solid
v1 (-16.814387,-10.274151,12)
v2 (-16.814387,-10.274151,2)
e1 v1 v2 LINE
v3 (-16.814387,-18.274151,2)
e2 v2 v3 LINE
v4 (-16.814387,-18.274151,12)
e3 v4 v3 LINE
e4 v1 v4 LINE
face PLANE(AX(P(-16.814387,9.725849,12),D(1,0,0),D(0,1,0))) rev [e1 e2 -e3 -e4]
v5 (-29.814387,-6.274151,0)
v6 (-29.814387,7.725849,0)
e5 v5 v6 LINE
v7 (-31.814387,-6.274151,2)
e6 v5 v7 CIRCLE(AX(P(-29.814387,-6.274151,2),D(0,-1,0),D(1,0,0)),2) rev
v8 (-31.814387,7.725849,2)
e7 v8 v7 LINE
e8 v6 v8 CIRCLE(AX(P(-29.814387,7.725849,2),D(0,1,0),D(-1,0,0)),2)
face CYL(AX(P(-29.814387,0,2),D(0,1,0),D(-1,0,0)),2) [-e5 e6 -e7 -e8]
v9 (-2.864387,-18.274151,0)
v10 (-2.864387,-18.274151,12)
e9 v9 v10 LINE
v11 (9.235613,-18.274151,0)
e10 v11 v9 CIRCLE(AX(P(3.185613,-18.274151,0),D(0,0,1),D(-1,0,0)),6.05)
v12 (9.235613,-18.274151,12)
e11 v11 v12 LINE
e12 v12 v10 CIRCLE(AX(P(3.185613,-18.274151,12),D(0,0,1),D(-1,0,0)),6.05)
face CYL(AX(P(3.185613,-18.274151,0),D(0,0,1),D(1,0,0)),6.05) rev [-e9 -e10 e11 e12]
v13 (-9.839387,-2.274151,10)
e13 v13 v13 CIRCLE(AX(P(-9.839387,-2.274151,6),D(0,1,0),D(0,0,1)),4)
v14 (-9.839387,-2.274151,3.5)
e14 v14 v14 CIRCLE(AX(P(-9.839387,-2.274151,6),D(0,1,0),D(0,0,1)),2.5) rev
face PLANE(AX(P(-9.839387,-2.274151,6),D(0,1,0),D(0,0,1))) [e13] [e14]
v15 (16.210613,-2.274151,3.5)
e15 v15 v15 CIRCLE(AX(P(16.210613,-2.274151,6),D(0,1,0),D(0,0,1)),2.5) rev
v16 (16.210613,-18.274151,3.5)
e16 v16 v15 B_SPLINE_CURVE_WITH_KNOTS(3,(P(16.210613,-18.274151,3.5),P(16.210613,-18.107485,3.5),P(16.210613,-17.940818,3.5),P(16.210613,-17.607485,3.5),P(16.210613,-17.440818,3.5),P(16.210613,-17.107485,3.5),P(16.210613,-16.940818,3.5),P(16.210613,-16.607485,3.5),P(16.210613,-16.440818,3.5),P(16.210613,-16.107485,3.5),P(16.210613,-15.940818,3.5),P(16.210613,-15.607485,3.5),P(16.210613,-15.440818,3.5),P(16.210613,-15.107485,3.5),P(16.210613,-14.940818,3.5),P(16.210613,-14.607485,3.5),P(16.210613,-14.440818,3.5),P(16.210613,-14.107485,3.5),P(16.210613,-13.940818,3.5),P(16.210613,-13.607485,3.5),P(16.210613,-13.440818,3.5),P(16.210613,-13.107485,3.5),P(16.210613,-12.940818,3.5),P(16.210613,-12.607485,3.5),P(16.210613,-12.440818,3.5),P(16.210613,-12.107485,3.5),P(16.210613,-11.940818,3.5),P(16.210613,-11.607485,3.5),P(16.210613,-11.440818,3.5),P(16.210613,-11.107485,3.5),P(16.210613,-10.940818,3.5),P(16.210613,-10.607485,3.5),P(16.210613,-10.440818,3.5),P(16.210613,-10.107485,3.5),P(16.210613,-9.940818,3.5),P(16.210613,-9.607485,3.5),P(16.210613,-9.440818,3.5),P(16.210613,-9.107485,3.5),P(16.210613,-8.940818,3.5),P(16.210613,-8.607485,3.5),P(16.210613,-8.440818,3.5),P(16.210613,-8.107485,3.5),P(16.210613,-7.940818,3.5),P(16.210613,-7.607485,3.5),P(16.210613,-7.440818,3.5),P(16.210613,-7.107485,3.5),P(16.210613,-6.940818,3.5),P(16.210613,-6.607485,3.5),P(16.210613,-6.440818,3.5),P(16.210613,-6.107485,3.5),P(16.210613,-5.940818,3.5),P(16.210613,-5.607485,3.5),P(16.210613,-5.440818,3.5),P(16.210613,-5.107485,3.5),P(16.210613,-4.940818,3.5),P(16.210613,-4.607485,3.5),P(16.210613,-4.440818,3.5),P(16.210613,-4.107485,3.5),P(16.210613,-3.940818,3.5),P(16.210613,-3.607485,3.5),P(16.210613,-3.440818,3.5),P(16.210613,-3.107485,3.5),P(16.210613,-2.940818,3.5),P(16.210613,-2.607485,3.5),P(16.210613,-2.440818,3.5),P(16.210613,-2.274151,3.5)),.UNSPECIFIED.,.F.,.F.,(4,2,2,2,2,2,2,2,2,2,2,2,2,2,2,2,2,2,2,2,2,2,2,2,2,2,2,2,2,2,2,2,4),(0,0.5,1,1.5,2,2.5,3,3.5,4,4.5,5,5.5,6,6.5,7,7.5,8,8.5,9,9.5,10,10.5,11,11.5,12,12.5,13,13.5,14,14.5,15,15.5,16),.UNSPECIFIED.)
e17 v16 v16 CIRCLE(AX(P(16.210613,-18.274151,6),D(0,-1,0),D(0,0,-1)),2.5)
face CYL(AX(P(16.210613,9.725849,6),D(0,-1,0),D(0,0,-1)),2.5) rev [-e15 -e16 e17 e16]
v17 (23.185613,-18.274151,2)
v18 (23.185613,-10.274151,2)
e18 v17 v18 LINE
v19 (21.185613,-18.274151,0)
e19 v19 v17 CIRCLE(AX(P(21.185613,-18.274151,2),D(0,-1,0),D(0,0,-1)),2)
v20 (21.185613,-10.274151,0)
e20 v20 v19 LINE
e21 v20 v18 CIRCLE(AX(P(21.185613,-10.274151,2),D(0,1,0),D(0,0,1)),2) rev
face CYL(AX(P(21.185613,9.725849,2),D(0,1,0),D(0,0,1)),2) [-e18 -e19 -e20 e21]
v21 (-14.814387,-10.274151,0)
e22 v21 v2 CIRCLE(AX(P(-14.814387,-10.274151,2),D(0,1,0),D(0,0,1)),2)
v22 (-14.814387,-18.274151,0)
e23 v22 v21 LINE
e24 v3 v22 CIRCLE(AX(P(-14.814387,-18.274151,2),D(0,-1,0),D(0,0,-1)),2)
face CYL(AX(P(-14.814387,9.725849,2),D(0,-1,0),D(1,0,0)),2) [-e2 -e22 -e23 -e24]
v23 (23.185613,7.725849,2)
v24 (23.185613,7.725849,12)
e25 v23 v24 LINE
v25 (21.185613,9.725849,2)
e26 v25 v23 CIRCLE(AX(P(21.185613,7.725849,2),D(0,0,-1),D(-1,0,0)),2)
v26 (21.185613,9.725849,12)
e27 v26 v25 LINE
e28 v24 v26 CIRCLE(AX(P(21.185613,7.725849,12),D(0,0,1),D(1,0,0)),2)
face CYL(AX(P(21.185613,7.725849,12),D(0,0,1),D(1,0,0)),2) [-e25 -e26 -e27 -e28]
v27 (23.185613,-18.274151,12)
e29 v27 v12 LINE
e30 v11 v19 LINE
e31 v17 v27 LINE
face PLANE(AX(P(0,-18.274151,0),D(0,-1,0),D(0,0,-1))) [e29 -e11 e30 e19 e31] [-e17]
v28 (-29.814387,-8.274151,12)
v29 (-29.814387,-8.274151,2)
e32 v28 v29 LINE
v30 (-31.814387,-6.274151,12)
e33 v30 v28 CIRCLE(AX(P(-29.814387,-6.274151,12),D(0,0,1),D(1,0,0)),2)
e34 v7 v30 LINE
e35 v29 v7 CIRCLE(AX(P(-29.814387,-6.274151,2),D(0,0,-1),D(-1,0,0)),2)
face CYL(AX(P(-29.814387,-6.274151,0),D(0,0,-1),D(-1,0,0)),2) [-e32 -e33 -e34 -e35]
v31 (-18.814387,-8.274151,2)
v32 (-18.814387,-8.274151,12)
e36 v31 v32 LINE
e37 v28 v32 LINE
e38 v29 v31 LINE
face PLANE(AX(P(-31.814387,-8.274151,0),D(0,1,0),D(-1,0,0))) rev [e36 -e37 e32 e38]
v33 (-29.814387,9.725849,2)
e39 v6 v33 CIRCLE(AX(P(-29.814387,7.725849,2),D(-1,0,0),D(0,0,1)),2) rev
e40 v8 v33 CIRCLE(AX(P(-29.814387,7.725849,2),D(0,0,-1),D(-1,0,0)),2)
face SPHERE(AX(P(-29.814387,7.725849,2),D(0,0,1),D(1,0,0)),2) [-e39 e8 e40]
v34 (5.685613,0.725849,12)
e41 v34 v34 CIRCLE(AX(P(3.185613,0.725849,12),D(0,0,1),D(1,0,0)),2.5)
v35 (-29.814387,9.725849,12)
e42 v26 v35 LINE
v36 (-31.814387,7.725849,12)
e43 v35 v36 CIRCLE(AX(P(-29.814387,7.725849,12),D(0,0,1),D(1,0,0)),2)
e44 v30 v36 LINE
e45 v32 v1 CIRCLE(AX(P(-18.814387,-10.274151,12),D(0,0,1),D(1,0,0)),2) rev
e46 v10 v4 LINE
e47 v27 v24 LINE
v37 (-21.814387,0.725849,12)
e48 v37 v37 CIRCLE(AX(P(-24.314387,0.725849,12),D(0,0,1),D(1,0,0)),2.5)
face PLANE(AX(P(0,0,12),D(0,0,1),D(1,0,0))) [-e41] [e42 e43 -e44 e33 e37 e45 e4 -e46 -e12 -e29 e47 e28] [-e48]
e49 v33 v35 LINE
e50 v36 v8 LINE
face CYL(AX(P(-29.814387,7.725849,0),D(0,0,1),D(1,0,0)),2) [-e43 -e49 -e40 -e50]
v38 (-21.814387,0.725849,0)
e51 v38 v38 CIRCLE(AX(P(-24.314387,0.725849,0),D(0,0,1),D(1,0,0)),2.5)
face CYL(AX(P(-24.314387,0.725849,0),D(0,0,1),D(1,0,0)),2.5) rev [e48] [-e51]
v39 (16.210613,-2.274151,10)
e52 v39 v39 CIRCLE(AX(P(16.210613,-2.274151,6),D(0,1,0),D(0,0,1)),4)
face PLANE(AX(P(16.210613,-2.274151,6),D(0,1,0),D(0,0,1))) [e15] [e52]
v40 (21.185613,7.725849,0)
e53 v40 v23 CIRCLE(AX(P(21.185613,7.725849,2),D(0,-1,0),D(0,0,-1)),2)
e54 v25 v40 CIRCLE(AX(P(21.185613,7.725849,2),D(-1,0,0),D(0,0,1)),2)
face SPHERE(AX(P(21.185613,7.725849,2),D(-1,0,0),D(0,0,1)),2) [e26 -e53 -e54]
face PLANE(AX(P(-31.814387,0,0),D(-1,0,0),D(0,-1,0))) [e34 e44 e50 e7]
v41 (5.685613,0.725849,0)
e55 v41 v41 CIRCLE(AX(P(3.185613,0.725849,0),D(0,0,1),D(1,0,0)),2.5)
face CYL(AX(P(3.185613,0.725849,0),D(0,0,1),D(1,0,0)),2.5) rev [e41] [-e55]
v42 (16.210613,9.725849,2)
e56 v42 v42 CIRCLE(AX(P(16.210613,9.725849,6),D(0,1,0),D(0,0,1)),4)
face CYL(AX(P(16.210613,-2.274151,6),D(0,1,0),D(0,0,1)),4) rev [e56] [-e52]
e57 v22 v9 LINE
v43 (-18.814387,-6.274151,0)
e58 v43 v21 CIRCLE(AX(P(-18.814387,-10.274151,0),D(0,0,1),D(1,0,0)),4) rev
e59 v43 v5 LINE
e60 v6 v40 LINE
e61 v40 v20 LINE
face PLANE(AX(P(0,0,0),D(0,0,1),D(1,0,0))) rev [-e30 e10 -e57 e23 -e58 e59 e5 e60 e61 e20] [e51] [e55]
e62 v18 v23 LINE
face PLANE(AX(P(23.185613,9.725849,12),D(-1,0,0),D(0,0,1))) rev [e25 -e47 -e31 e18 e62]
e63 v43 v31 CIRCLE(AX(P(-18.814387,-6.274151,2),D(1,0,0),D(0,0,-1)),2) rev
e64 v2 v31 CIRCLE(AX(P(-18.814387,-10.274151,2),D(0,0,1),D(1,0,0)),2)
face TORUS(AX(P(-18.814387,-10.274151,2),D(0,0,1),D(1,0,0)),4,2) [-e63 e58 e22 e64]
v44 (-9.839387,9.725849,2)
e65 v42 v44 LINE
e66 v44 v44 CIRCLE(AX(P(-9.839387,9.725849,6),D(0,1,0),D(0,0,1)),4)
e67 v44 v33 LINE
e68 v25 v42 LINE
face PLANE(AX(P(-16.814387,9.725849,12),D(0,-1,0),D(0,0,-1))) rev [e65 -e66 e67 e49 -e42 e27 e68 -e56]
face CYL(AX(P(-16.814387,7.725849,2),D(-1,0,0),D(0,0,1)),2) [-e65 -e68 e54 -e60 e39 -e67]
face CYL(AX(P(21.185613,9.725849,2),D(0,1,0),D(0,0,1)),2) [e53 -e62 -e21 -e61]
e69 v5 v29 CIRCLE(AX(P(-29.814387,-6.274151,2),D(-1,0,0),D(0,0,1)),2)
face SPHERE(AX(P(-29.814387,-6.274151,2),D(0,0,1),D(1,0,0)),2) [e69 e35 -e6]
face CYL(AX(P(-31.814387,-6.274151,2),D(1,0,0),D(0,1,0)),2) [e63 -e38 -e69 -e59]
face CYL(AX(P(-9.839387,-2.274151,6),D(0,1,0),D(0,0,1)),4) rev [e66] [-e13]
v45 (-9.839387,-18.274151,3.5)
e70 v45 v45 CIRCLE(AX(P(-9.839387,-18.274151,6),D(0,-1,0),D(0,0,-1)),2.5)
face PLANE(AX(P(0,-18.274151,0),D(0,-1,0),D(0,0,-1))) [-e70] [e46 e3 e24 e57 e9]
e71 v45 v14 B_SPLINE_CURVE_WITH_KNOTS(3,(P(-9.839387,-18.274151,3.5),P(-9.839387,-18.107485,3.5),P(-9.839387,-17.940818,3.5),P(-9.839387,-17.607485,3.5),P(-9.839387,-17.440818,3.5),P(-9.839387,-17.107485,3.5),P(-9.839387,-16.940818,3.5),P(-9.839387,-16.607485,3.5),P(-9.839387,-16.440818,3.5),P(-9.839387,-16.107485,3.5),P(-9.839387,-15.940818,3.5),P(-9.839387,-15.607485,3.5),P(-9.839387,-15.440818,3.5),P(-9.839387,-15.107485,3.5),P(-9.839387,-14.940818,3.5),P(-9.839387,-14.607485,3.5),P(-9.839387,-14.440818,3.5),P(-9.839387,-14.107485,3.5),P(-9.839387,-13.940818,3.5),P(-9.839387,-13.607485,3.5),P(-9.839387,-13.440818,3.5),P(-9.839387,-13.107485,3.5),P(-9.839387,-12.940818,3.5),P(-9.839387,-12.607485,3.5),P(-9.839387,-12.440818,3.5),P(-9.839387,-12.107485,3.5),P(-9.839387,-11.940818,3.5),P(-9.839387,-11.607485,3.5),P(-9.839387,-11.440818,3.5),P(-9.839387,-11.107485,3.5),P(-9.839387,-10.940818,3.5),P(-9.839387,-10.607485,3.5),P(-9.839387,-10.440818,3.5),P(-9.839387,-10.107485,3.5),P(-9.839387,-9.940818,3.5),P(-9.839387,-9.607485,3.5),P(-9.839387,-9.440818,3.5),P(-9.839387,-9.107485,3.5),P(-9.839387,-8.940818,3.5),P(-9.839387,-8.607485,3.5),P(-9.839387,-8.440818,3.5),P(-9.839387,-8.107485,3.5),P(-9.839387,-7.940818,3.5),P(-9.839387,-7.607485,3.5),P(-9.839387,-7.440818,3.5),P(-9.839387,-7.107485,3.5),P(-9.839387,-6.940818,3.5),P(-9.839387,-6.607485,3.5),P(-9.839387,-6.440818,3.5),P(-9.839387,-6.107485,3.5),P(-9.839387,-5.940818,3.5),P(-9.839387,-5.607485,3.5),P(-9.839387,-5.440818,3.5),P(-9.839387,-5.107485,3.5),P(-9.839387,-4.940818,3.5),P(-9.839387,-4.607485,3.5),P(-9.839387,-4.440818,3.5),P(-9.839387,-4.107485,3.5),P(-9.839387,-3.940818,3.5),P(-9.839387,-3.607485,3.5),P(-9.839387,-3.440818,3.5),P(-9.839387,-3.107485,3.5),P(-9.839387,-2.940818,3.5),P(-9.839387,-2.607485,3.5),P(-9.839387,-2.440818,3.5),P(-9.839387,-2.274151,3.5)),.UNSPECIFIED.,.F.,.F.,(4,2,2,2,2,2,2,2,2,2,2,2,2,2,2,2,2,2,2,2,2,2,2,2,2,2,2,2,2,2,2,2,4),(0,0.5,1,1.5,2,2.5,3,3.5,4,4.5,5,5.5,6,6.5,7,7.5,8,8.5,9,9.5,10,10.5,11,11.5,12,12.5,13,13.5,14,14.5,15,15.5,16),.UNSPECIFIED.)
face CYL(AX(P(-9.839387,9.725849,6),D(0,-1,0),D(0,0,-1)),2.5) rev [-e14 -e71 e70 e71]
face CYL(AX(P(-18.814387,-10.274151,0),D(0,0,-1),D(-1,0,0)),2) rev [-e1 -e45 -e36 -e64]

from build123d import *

# Parameters (mm, degrees)
ESQUISSE1_W                  = 40
ESQUISSE1_H                  = 18
BOSS_EXTRU_1_DEPTH           = 12
ESQUISSE2_W                  = 40
ESQUISSE2_H                  = 12
BOSS_EXTRU_2_DEPTH           = 10
ENL_V_MAT_EXTRU_1_DEPTH      = 12
ESQUISSE4_R                  = 2.5
ENL_V_MAT_EXTRU_2_DEPTH      = 28
ESQUISSE5_R                  = 2.5
ENL_V_MAT_EXTRU_3_DEPTH      = 12
ESQUISSE6_R                  = 4
ENL_V_MAT_EXTRU_5_DEPTH      = 12
ESQUISSE7_W                  = 12
ESQUISSE7_H                  = 18
BOSS_EXTRU_3_DEPTH           = 15
ESQUISSE8_W                  = 12
ESQUISSE8_H                  = 18
BOSS_EXTRU_4_DEPTH           = 15
ESQUISSE9_R                  = 2.5
ENL_V_MAT_EXTRU_6_DEPTH      = 12
CONG_1_R                     = 2
ENL_V_MAT_EXTRU_7_DEPTH      = 10
ENL_V_MAT_EXTRU_7_DEPTH_BACK = 27
ESQUISSE11_W                 = 15
ESQUISSE11_H                 = 16.6984892
CONG_2_R                     = 2


# Some blends are built 0.0001 mm under size
with BuildPart() as part:
    # Esquisse1 → Boss.-Extru.1 (new body)
    with BuildSketch(Plane.XY):
        with Locations((3.185612757, 0.725848564)):
            Rectangle(ESQUISSE1_W, ESQUISSE1_H)
    extrude(amount=BOSS_EXTRU_1_DEPTH)

    # Esquisse2 → Boss.-Extru.2 (add)
    with BuildSketch(Plane.XZ.offset(8.274151436)):
        with Locations((3.185612757, 6)):
            Rectangle(ESQUISSE2_W, ESQUISSE2_H)
    extrude(amount=BOSS_EXTRU_2_DEPTH)

    # Esquisse3 → Enlèv. mat.-Extru.1 (cut)
    with BuildSketch(Plane.XY.offset(12)):
        with BuildLine():
            Line((-2.864387243, -18.274151436), (9.235612757, -18.274151436))
            ThreePointArc((9.235612757, -18.274151436), (3.185612757, -12.224151436), (-2.864387243, -18.274151436))
        make_face()
    extrude(amount=-ENL_V_MAT_EXTRU_1_DEPTH, mode=Mode.SUBTRACT)

    # Esquisse4 → Enlèv. mat.-Extru.2 (cut)
    with BuildSketch(Plane.XZ.offset(18.274151436)):
        with Locations(Location((-9.839387243, 6, 0), (0, 0, 270))):
            Circle(ESQUISSE4_R)
        with Locations(Location((16.210612757, 6, 0), (0, 0, 270))):
            Circle(ESQUISSE4_R)
    extrude(amount=-ENL_V_MAT_EXTRU_2_DEPTH, mode=Mode.SUBTRACT)

    # Esquisse5 → Enlèv. mat.-Extru.3 (cut)
    with BuildSketch(Plane.XY.offset(12)):
        with Locations((3.185612757, 0.725848564)):
            Circle(ESQUISSE5_R)
    extrude(amount=-ENL_V_MAT_EXTRU_3_DEPTH, mode=Mode.SUBTRACT)

    # Esquisse6 → Enlèv. mat.-Extru.5 (cut)
    with BuildSketch(Plane(origin=(0, 9.725848564, 0), x_dir=(1, 0, 0), z_dir=(0, 1, 0))):
        with Locations(Location((16.210612757, -6, 0), (0, 0, 270))):
            Circle(ESQUISSE6_R)
        with Locations(Location((-9.839387243, -6, 0), (0, 0, 270))):
            Circle(ESQUISSE6_R)
    extrude(amount=-ENL_V_MAT_EXTRU_5_DEPTH, mode=Mode.SUBTRACT)

    # Esquisse7 → Boss.-Extru.3 (add)
    with BuildSketch(Plane.ZY.offset(16.814387243)):
        with Locations((6, 0.725848564)):
            Rectangle(ESQUISSE7_W, ESQUISSE7_H)
    extrude(amount=BOSS_EXTRU_3_DEPTH)

    # Esquisse8 → Boss.-Extru.4 (add)
    with BuildSketch(Plane(origin=(23.185612757, 0, 0), x_dir=(0, 0, -1), z_dir=(1, 0, 0))):
        with Locations((-6, 0.725848564)):
            Rectangle(ESQUISSE8_W, ESQUISSE8_H)
    extrude(amount=BOSS_EXTRU_4_DEPTH)

    # Esquisse9 → Enlèv. mat.-Extru.6 (cut)
    with BuildSketch(Plane.XY.offset(12)):
        with Locations((-24.314387243, 0.725848564)):
            Circle(ESQUISSE9_R)
        with Locations((30.685612757, 0.725848564)):
            Circle(ESQUISSE9_R)
    extrude(amount=-ENL_V_MAT_EXTRU_6_DEPTH, mode=Mode.SUBTRACT)

    # Congé1
    cong_1_edges = [part.edges().sort_by_distance(p)[0] for p in [
        (3.185612757, 9.725848564, 0),
        (23.185612757, -13.274151436, 0),
        (-16.814387243, -13.274151436, 0),
        (-16.814387243, -8.274151436, 6),
        (-24.314387243, -8.274151436, 0),
        (-31.814387243, 0.725848564, 0),
        (-31.814387243, -8.274151436, 6),
        (-31.814387243, 9.725848564, 6),
        (30.685612757, -8.274151436, 0),
        (23.185612757, -8.274151436, 6),
        (38.185612757, 0.725848564, 0),
        (38.185612757, 9.725848564, 6),
        (38.185612757, -8.274151436, 6),
    ]]
    fillet(cong_1_edges, radius=CONG_1_R - 0.0001)  # a hair under: the kernel refuses the full size

    # Esquisse11 → Enlèv. mat.-Extru.7 (cut, two sides: drawn at the far end of the back side and taken through both)
    with BuildSketch(Plane.XZ.offset(8.274151436).offset(-ENL_V_MAT_EXTRU_7_DEPTH_BACK)):
        with Locations((30.685612757, 5.475380595)):
            Rectangle(ESQUISSE11_W, ESQUISSE11_H)
    extrude(amount=ENL_V_MAT_EXTRU_7_DEPTH + ENL_V_MAT_EXTRU_7_DEPTH_BACK, mode=Mode.SUBTRACT)

    # Congé2
    # the kernel refuses this fillet: 2 mm, written as the material it takes off along each edge
    with BuildSketch(Plane(origin=(23.185612757, 9.725848564, 1.9999), x_dir=(-0.999999998749875, 5.00025000614922e-05, 0), z_dir=(0, 0, 1))) as cong_2_piece_1:
        with BuildLine():
            CenterArc((1.999799997, 1.999999997), CONG_2_R, 180.002864932, 90)
            Line((-0.0002, 1.999899992), (-0.0402, 1.999897992))
            ThreePointArc((-0.0402, 1.999897992), (-0.04005, 0.999947999), (-0.04, -2e-06))
            Line((-0.04, -2e-06), (2e-06, -0.04))
            ThreePointArc((2e-06, -0.04), (0.999951999, -0.03995), (1.999902003, -0.04))
            Line((1.999902003, -0.04), (1.999900003, 0))
        make_face()
    extrude(amount=14.999850006, mode=Mode.SUBTRACT)
    with BuildSketch(Plane(origin=(23.185612757, 7.725948564, 1.9999), x_dir=(0, 1, 0), z_dir=(0, 0, 1))) as cong_2_piece_2:
        with BuildLine():
            CenterArc((0, 1.9999), CONG_2_R, 270, 90)
            Line((2, 1.9999), (2.04, 1.9999))
            ThreePointArc((2.04, 1.9999), (2.0399, 0.99995), (2.0399, 0))
            Line((2.0399, 0), (1.9999, -0.04))
            ThreePointArc((1.9999, -0.04), (0.99995, -0.04), (0, -0.0401))
            Line((0, -0.0401), (0, -0.0001))
        make_face()
    revolve(axis=Axis((23.185612757, 7.725948564, 1.9999), (-1, 0, 0)), revolution_arc=90, mode=Mode.SUBTRACT)
    with BuildSketch(Plane(origin=(23.185612757, -11.809873032, 0), x_dir=(-0.999999998749875, 0, -5.000250006249136e-05), z_dir=(0, 1, 0))) as cong_2_piece_3:
        with BuildLine():
            CenterArc((1.999799998, 1.999999997), CONG_2_R, 180.002864932, 90)
            Line((-0.0002, 1.999899992), (-0.0402, 1.999897992))
            ThreePointArc((-0.0402, 1.999897992), (-0.04005, 0.999947999), (-0.04, -2e-06))
            Line((-0.04, -2e-06), (2e-06, -0.04))
            ThreePointArc((2e-06, -0.04), (0.999951999, -0.03995), (1.999902003, -0.04))
            Line((1.999902003, -0.04), (1.999900003, 0))
        make_face()
    extrude(amount=19.535821596, mode=Mode.SUBTRACT)


solid = part.part
